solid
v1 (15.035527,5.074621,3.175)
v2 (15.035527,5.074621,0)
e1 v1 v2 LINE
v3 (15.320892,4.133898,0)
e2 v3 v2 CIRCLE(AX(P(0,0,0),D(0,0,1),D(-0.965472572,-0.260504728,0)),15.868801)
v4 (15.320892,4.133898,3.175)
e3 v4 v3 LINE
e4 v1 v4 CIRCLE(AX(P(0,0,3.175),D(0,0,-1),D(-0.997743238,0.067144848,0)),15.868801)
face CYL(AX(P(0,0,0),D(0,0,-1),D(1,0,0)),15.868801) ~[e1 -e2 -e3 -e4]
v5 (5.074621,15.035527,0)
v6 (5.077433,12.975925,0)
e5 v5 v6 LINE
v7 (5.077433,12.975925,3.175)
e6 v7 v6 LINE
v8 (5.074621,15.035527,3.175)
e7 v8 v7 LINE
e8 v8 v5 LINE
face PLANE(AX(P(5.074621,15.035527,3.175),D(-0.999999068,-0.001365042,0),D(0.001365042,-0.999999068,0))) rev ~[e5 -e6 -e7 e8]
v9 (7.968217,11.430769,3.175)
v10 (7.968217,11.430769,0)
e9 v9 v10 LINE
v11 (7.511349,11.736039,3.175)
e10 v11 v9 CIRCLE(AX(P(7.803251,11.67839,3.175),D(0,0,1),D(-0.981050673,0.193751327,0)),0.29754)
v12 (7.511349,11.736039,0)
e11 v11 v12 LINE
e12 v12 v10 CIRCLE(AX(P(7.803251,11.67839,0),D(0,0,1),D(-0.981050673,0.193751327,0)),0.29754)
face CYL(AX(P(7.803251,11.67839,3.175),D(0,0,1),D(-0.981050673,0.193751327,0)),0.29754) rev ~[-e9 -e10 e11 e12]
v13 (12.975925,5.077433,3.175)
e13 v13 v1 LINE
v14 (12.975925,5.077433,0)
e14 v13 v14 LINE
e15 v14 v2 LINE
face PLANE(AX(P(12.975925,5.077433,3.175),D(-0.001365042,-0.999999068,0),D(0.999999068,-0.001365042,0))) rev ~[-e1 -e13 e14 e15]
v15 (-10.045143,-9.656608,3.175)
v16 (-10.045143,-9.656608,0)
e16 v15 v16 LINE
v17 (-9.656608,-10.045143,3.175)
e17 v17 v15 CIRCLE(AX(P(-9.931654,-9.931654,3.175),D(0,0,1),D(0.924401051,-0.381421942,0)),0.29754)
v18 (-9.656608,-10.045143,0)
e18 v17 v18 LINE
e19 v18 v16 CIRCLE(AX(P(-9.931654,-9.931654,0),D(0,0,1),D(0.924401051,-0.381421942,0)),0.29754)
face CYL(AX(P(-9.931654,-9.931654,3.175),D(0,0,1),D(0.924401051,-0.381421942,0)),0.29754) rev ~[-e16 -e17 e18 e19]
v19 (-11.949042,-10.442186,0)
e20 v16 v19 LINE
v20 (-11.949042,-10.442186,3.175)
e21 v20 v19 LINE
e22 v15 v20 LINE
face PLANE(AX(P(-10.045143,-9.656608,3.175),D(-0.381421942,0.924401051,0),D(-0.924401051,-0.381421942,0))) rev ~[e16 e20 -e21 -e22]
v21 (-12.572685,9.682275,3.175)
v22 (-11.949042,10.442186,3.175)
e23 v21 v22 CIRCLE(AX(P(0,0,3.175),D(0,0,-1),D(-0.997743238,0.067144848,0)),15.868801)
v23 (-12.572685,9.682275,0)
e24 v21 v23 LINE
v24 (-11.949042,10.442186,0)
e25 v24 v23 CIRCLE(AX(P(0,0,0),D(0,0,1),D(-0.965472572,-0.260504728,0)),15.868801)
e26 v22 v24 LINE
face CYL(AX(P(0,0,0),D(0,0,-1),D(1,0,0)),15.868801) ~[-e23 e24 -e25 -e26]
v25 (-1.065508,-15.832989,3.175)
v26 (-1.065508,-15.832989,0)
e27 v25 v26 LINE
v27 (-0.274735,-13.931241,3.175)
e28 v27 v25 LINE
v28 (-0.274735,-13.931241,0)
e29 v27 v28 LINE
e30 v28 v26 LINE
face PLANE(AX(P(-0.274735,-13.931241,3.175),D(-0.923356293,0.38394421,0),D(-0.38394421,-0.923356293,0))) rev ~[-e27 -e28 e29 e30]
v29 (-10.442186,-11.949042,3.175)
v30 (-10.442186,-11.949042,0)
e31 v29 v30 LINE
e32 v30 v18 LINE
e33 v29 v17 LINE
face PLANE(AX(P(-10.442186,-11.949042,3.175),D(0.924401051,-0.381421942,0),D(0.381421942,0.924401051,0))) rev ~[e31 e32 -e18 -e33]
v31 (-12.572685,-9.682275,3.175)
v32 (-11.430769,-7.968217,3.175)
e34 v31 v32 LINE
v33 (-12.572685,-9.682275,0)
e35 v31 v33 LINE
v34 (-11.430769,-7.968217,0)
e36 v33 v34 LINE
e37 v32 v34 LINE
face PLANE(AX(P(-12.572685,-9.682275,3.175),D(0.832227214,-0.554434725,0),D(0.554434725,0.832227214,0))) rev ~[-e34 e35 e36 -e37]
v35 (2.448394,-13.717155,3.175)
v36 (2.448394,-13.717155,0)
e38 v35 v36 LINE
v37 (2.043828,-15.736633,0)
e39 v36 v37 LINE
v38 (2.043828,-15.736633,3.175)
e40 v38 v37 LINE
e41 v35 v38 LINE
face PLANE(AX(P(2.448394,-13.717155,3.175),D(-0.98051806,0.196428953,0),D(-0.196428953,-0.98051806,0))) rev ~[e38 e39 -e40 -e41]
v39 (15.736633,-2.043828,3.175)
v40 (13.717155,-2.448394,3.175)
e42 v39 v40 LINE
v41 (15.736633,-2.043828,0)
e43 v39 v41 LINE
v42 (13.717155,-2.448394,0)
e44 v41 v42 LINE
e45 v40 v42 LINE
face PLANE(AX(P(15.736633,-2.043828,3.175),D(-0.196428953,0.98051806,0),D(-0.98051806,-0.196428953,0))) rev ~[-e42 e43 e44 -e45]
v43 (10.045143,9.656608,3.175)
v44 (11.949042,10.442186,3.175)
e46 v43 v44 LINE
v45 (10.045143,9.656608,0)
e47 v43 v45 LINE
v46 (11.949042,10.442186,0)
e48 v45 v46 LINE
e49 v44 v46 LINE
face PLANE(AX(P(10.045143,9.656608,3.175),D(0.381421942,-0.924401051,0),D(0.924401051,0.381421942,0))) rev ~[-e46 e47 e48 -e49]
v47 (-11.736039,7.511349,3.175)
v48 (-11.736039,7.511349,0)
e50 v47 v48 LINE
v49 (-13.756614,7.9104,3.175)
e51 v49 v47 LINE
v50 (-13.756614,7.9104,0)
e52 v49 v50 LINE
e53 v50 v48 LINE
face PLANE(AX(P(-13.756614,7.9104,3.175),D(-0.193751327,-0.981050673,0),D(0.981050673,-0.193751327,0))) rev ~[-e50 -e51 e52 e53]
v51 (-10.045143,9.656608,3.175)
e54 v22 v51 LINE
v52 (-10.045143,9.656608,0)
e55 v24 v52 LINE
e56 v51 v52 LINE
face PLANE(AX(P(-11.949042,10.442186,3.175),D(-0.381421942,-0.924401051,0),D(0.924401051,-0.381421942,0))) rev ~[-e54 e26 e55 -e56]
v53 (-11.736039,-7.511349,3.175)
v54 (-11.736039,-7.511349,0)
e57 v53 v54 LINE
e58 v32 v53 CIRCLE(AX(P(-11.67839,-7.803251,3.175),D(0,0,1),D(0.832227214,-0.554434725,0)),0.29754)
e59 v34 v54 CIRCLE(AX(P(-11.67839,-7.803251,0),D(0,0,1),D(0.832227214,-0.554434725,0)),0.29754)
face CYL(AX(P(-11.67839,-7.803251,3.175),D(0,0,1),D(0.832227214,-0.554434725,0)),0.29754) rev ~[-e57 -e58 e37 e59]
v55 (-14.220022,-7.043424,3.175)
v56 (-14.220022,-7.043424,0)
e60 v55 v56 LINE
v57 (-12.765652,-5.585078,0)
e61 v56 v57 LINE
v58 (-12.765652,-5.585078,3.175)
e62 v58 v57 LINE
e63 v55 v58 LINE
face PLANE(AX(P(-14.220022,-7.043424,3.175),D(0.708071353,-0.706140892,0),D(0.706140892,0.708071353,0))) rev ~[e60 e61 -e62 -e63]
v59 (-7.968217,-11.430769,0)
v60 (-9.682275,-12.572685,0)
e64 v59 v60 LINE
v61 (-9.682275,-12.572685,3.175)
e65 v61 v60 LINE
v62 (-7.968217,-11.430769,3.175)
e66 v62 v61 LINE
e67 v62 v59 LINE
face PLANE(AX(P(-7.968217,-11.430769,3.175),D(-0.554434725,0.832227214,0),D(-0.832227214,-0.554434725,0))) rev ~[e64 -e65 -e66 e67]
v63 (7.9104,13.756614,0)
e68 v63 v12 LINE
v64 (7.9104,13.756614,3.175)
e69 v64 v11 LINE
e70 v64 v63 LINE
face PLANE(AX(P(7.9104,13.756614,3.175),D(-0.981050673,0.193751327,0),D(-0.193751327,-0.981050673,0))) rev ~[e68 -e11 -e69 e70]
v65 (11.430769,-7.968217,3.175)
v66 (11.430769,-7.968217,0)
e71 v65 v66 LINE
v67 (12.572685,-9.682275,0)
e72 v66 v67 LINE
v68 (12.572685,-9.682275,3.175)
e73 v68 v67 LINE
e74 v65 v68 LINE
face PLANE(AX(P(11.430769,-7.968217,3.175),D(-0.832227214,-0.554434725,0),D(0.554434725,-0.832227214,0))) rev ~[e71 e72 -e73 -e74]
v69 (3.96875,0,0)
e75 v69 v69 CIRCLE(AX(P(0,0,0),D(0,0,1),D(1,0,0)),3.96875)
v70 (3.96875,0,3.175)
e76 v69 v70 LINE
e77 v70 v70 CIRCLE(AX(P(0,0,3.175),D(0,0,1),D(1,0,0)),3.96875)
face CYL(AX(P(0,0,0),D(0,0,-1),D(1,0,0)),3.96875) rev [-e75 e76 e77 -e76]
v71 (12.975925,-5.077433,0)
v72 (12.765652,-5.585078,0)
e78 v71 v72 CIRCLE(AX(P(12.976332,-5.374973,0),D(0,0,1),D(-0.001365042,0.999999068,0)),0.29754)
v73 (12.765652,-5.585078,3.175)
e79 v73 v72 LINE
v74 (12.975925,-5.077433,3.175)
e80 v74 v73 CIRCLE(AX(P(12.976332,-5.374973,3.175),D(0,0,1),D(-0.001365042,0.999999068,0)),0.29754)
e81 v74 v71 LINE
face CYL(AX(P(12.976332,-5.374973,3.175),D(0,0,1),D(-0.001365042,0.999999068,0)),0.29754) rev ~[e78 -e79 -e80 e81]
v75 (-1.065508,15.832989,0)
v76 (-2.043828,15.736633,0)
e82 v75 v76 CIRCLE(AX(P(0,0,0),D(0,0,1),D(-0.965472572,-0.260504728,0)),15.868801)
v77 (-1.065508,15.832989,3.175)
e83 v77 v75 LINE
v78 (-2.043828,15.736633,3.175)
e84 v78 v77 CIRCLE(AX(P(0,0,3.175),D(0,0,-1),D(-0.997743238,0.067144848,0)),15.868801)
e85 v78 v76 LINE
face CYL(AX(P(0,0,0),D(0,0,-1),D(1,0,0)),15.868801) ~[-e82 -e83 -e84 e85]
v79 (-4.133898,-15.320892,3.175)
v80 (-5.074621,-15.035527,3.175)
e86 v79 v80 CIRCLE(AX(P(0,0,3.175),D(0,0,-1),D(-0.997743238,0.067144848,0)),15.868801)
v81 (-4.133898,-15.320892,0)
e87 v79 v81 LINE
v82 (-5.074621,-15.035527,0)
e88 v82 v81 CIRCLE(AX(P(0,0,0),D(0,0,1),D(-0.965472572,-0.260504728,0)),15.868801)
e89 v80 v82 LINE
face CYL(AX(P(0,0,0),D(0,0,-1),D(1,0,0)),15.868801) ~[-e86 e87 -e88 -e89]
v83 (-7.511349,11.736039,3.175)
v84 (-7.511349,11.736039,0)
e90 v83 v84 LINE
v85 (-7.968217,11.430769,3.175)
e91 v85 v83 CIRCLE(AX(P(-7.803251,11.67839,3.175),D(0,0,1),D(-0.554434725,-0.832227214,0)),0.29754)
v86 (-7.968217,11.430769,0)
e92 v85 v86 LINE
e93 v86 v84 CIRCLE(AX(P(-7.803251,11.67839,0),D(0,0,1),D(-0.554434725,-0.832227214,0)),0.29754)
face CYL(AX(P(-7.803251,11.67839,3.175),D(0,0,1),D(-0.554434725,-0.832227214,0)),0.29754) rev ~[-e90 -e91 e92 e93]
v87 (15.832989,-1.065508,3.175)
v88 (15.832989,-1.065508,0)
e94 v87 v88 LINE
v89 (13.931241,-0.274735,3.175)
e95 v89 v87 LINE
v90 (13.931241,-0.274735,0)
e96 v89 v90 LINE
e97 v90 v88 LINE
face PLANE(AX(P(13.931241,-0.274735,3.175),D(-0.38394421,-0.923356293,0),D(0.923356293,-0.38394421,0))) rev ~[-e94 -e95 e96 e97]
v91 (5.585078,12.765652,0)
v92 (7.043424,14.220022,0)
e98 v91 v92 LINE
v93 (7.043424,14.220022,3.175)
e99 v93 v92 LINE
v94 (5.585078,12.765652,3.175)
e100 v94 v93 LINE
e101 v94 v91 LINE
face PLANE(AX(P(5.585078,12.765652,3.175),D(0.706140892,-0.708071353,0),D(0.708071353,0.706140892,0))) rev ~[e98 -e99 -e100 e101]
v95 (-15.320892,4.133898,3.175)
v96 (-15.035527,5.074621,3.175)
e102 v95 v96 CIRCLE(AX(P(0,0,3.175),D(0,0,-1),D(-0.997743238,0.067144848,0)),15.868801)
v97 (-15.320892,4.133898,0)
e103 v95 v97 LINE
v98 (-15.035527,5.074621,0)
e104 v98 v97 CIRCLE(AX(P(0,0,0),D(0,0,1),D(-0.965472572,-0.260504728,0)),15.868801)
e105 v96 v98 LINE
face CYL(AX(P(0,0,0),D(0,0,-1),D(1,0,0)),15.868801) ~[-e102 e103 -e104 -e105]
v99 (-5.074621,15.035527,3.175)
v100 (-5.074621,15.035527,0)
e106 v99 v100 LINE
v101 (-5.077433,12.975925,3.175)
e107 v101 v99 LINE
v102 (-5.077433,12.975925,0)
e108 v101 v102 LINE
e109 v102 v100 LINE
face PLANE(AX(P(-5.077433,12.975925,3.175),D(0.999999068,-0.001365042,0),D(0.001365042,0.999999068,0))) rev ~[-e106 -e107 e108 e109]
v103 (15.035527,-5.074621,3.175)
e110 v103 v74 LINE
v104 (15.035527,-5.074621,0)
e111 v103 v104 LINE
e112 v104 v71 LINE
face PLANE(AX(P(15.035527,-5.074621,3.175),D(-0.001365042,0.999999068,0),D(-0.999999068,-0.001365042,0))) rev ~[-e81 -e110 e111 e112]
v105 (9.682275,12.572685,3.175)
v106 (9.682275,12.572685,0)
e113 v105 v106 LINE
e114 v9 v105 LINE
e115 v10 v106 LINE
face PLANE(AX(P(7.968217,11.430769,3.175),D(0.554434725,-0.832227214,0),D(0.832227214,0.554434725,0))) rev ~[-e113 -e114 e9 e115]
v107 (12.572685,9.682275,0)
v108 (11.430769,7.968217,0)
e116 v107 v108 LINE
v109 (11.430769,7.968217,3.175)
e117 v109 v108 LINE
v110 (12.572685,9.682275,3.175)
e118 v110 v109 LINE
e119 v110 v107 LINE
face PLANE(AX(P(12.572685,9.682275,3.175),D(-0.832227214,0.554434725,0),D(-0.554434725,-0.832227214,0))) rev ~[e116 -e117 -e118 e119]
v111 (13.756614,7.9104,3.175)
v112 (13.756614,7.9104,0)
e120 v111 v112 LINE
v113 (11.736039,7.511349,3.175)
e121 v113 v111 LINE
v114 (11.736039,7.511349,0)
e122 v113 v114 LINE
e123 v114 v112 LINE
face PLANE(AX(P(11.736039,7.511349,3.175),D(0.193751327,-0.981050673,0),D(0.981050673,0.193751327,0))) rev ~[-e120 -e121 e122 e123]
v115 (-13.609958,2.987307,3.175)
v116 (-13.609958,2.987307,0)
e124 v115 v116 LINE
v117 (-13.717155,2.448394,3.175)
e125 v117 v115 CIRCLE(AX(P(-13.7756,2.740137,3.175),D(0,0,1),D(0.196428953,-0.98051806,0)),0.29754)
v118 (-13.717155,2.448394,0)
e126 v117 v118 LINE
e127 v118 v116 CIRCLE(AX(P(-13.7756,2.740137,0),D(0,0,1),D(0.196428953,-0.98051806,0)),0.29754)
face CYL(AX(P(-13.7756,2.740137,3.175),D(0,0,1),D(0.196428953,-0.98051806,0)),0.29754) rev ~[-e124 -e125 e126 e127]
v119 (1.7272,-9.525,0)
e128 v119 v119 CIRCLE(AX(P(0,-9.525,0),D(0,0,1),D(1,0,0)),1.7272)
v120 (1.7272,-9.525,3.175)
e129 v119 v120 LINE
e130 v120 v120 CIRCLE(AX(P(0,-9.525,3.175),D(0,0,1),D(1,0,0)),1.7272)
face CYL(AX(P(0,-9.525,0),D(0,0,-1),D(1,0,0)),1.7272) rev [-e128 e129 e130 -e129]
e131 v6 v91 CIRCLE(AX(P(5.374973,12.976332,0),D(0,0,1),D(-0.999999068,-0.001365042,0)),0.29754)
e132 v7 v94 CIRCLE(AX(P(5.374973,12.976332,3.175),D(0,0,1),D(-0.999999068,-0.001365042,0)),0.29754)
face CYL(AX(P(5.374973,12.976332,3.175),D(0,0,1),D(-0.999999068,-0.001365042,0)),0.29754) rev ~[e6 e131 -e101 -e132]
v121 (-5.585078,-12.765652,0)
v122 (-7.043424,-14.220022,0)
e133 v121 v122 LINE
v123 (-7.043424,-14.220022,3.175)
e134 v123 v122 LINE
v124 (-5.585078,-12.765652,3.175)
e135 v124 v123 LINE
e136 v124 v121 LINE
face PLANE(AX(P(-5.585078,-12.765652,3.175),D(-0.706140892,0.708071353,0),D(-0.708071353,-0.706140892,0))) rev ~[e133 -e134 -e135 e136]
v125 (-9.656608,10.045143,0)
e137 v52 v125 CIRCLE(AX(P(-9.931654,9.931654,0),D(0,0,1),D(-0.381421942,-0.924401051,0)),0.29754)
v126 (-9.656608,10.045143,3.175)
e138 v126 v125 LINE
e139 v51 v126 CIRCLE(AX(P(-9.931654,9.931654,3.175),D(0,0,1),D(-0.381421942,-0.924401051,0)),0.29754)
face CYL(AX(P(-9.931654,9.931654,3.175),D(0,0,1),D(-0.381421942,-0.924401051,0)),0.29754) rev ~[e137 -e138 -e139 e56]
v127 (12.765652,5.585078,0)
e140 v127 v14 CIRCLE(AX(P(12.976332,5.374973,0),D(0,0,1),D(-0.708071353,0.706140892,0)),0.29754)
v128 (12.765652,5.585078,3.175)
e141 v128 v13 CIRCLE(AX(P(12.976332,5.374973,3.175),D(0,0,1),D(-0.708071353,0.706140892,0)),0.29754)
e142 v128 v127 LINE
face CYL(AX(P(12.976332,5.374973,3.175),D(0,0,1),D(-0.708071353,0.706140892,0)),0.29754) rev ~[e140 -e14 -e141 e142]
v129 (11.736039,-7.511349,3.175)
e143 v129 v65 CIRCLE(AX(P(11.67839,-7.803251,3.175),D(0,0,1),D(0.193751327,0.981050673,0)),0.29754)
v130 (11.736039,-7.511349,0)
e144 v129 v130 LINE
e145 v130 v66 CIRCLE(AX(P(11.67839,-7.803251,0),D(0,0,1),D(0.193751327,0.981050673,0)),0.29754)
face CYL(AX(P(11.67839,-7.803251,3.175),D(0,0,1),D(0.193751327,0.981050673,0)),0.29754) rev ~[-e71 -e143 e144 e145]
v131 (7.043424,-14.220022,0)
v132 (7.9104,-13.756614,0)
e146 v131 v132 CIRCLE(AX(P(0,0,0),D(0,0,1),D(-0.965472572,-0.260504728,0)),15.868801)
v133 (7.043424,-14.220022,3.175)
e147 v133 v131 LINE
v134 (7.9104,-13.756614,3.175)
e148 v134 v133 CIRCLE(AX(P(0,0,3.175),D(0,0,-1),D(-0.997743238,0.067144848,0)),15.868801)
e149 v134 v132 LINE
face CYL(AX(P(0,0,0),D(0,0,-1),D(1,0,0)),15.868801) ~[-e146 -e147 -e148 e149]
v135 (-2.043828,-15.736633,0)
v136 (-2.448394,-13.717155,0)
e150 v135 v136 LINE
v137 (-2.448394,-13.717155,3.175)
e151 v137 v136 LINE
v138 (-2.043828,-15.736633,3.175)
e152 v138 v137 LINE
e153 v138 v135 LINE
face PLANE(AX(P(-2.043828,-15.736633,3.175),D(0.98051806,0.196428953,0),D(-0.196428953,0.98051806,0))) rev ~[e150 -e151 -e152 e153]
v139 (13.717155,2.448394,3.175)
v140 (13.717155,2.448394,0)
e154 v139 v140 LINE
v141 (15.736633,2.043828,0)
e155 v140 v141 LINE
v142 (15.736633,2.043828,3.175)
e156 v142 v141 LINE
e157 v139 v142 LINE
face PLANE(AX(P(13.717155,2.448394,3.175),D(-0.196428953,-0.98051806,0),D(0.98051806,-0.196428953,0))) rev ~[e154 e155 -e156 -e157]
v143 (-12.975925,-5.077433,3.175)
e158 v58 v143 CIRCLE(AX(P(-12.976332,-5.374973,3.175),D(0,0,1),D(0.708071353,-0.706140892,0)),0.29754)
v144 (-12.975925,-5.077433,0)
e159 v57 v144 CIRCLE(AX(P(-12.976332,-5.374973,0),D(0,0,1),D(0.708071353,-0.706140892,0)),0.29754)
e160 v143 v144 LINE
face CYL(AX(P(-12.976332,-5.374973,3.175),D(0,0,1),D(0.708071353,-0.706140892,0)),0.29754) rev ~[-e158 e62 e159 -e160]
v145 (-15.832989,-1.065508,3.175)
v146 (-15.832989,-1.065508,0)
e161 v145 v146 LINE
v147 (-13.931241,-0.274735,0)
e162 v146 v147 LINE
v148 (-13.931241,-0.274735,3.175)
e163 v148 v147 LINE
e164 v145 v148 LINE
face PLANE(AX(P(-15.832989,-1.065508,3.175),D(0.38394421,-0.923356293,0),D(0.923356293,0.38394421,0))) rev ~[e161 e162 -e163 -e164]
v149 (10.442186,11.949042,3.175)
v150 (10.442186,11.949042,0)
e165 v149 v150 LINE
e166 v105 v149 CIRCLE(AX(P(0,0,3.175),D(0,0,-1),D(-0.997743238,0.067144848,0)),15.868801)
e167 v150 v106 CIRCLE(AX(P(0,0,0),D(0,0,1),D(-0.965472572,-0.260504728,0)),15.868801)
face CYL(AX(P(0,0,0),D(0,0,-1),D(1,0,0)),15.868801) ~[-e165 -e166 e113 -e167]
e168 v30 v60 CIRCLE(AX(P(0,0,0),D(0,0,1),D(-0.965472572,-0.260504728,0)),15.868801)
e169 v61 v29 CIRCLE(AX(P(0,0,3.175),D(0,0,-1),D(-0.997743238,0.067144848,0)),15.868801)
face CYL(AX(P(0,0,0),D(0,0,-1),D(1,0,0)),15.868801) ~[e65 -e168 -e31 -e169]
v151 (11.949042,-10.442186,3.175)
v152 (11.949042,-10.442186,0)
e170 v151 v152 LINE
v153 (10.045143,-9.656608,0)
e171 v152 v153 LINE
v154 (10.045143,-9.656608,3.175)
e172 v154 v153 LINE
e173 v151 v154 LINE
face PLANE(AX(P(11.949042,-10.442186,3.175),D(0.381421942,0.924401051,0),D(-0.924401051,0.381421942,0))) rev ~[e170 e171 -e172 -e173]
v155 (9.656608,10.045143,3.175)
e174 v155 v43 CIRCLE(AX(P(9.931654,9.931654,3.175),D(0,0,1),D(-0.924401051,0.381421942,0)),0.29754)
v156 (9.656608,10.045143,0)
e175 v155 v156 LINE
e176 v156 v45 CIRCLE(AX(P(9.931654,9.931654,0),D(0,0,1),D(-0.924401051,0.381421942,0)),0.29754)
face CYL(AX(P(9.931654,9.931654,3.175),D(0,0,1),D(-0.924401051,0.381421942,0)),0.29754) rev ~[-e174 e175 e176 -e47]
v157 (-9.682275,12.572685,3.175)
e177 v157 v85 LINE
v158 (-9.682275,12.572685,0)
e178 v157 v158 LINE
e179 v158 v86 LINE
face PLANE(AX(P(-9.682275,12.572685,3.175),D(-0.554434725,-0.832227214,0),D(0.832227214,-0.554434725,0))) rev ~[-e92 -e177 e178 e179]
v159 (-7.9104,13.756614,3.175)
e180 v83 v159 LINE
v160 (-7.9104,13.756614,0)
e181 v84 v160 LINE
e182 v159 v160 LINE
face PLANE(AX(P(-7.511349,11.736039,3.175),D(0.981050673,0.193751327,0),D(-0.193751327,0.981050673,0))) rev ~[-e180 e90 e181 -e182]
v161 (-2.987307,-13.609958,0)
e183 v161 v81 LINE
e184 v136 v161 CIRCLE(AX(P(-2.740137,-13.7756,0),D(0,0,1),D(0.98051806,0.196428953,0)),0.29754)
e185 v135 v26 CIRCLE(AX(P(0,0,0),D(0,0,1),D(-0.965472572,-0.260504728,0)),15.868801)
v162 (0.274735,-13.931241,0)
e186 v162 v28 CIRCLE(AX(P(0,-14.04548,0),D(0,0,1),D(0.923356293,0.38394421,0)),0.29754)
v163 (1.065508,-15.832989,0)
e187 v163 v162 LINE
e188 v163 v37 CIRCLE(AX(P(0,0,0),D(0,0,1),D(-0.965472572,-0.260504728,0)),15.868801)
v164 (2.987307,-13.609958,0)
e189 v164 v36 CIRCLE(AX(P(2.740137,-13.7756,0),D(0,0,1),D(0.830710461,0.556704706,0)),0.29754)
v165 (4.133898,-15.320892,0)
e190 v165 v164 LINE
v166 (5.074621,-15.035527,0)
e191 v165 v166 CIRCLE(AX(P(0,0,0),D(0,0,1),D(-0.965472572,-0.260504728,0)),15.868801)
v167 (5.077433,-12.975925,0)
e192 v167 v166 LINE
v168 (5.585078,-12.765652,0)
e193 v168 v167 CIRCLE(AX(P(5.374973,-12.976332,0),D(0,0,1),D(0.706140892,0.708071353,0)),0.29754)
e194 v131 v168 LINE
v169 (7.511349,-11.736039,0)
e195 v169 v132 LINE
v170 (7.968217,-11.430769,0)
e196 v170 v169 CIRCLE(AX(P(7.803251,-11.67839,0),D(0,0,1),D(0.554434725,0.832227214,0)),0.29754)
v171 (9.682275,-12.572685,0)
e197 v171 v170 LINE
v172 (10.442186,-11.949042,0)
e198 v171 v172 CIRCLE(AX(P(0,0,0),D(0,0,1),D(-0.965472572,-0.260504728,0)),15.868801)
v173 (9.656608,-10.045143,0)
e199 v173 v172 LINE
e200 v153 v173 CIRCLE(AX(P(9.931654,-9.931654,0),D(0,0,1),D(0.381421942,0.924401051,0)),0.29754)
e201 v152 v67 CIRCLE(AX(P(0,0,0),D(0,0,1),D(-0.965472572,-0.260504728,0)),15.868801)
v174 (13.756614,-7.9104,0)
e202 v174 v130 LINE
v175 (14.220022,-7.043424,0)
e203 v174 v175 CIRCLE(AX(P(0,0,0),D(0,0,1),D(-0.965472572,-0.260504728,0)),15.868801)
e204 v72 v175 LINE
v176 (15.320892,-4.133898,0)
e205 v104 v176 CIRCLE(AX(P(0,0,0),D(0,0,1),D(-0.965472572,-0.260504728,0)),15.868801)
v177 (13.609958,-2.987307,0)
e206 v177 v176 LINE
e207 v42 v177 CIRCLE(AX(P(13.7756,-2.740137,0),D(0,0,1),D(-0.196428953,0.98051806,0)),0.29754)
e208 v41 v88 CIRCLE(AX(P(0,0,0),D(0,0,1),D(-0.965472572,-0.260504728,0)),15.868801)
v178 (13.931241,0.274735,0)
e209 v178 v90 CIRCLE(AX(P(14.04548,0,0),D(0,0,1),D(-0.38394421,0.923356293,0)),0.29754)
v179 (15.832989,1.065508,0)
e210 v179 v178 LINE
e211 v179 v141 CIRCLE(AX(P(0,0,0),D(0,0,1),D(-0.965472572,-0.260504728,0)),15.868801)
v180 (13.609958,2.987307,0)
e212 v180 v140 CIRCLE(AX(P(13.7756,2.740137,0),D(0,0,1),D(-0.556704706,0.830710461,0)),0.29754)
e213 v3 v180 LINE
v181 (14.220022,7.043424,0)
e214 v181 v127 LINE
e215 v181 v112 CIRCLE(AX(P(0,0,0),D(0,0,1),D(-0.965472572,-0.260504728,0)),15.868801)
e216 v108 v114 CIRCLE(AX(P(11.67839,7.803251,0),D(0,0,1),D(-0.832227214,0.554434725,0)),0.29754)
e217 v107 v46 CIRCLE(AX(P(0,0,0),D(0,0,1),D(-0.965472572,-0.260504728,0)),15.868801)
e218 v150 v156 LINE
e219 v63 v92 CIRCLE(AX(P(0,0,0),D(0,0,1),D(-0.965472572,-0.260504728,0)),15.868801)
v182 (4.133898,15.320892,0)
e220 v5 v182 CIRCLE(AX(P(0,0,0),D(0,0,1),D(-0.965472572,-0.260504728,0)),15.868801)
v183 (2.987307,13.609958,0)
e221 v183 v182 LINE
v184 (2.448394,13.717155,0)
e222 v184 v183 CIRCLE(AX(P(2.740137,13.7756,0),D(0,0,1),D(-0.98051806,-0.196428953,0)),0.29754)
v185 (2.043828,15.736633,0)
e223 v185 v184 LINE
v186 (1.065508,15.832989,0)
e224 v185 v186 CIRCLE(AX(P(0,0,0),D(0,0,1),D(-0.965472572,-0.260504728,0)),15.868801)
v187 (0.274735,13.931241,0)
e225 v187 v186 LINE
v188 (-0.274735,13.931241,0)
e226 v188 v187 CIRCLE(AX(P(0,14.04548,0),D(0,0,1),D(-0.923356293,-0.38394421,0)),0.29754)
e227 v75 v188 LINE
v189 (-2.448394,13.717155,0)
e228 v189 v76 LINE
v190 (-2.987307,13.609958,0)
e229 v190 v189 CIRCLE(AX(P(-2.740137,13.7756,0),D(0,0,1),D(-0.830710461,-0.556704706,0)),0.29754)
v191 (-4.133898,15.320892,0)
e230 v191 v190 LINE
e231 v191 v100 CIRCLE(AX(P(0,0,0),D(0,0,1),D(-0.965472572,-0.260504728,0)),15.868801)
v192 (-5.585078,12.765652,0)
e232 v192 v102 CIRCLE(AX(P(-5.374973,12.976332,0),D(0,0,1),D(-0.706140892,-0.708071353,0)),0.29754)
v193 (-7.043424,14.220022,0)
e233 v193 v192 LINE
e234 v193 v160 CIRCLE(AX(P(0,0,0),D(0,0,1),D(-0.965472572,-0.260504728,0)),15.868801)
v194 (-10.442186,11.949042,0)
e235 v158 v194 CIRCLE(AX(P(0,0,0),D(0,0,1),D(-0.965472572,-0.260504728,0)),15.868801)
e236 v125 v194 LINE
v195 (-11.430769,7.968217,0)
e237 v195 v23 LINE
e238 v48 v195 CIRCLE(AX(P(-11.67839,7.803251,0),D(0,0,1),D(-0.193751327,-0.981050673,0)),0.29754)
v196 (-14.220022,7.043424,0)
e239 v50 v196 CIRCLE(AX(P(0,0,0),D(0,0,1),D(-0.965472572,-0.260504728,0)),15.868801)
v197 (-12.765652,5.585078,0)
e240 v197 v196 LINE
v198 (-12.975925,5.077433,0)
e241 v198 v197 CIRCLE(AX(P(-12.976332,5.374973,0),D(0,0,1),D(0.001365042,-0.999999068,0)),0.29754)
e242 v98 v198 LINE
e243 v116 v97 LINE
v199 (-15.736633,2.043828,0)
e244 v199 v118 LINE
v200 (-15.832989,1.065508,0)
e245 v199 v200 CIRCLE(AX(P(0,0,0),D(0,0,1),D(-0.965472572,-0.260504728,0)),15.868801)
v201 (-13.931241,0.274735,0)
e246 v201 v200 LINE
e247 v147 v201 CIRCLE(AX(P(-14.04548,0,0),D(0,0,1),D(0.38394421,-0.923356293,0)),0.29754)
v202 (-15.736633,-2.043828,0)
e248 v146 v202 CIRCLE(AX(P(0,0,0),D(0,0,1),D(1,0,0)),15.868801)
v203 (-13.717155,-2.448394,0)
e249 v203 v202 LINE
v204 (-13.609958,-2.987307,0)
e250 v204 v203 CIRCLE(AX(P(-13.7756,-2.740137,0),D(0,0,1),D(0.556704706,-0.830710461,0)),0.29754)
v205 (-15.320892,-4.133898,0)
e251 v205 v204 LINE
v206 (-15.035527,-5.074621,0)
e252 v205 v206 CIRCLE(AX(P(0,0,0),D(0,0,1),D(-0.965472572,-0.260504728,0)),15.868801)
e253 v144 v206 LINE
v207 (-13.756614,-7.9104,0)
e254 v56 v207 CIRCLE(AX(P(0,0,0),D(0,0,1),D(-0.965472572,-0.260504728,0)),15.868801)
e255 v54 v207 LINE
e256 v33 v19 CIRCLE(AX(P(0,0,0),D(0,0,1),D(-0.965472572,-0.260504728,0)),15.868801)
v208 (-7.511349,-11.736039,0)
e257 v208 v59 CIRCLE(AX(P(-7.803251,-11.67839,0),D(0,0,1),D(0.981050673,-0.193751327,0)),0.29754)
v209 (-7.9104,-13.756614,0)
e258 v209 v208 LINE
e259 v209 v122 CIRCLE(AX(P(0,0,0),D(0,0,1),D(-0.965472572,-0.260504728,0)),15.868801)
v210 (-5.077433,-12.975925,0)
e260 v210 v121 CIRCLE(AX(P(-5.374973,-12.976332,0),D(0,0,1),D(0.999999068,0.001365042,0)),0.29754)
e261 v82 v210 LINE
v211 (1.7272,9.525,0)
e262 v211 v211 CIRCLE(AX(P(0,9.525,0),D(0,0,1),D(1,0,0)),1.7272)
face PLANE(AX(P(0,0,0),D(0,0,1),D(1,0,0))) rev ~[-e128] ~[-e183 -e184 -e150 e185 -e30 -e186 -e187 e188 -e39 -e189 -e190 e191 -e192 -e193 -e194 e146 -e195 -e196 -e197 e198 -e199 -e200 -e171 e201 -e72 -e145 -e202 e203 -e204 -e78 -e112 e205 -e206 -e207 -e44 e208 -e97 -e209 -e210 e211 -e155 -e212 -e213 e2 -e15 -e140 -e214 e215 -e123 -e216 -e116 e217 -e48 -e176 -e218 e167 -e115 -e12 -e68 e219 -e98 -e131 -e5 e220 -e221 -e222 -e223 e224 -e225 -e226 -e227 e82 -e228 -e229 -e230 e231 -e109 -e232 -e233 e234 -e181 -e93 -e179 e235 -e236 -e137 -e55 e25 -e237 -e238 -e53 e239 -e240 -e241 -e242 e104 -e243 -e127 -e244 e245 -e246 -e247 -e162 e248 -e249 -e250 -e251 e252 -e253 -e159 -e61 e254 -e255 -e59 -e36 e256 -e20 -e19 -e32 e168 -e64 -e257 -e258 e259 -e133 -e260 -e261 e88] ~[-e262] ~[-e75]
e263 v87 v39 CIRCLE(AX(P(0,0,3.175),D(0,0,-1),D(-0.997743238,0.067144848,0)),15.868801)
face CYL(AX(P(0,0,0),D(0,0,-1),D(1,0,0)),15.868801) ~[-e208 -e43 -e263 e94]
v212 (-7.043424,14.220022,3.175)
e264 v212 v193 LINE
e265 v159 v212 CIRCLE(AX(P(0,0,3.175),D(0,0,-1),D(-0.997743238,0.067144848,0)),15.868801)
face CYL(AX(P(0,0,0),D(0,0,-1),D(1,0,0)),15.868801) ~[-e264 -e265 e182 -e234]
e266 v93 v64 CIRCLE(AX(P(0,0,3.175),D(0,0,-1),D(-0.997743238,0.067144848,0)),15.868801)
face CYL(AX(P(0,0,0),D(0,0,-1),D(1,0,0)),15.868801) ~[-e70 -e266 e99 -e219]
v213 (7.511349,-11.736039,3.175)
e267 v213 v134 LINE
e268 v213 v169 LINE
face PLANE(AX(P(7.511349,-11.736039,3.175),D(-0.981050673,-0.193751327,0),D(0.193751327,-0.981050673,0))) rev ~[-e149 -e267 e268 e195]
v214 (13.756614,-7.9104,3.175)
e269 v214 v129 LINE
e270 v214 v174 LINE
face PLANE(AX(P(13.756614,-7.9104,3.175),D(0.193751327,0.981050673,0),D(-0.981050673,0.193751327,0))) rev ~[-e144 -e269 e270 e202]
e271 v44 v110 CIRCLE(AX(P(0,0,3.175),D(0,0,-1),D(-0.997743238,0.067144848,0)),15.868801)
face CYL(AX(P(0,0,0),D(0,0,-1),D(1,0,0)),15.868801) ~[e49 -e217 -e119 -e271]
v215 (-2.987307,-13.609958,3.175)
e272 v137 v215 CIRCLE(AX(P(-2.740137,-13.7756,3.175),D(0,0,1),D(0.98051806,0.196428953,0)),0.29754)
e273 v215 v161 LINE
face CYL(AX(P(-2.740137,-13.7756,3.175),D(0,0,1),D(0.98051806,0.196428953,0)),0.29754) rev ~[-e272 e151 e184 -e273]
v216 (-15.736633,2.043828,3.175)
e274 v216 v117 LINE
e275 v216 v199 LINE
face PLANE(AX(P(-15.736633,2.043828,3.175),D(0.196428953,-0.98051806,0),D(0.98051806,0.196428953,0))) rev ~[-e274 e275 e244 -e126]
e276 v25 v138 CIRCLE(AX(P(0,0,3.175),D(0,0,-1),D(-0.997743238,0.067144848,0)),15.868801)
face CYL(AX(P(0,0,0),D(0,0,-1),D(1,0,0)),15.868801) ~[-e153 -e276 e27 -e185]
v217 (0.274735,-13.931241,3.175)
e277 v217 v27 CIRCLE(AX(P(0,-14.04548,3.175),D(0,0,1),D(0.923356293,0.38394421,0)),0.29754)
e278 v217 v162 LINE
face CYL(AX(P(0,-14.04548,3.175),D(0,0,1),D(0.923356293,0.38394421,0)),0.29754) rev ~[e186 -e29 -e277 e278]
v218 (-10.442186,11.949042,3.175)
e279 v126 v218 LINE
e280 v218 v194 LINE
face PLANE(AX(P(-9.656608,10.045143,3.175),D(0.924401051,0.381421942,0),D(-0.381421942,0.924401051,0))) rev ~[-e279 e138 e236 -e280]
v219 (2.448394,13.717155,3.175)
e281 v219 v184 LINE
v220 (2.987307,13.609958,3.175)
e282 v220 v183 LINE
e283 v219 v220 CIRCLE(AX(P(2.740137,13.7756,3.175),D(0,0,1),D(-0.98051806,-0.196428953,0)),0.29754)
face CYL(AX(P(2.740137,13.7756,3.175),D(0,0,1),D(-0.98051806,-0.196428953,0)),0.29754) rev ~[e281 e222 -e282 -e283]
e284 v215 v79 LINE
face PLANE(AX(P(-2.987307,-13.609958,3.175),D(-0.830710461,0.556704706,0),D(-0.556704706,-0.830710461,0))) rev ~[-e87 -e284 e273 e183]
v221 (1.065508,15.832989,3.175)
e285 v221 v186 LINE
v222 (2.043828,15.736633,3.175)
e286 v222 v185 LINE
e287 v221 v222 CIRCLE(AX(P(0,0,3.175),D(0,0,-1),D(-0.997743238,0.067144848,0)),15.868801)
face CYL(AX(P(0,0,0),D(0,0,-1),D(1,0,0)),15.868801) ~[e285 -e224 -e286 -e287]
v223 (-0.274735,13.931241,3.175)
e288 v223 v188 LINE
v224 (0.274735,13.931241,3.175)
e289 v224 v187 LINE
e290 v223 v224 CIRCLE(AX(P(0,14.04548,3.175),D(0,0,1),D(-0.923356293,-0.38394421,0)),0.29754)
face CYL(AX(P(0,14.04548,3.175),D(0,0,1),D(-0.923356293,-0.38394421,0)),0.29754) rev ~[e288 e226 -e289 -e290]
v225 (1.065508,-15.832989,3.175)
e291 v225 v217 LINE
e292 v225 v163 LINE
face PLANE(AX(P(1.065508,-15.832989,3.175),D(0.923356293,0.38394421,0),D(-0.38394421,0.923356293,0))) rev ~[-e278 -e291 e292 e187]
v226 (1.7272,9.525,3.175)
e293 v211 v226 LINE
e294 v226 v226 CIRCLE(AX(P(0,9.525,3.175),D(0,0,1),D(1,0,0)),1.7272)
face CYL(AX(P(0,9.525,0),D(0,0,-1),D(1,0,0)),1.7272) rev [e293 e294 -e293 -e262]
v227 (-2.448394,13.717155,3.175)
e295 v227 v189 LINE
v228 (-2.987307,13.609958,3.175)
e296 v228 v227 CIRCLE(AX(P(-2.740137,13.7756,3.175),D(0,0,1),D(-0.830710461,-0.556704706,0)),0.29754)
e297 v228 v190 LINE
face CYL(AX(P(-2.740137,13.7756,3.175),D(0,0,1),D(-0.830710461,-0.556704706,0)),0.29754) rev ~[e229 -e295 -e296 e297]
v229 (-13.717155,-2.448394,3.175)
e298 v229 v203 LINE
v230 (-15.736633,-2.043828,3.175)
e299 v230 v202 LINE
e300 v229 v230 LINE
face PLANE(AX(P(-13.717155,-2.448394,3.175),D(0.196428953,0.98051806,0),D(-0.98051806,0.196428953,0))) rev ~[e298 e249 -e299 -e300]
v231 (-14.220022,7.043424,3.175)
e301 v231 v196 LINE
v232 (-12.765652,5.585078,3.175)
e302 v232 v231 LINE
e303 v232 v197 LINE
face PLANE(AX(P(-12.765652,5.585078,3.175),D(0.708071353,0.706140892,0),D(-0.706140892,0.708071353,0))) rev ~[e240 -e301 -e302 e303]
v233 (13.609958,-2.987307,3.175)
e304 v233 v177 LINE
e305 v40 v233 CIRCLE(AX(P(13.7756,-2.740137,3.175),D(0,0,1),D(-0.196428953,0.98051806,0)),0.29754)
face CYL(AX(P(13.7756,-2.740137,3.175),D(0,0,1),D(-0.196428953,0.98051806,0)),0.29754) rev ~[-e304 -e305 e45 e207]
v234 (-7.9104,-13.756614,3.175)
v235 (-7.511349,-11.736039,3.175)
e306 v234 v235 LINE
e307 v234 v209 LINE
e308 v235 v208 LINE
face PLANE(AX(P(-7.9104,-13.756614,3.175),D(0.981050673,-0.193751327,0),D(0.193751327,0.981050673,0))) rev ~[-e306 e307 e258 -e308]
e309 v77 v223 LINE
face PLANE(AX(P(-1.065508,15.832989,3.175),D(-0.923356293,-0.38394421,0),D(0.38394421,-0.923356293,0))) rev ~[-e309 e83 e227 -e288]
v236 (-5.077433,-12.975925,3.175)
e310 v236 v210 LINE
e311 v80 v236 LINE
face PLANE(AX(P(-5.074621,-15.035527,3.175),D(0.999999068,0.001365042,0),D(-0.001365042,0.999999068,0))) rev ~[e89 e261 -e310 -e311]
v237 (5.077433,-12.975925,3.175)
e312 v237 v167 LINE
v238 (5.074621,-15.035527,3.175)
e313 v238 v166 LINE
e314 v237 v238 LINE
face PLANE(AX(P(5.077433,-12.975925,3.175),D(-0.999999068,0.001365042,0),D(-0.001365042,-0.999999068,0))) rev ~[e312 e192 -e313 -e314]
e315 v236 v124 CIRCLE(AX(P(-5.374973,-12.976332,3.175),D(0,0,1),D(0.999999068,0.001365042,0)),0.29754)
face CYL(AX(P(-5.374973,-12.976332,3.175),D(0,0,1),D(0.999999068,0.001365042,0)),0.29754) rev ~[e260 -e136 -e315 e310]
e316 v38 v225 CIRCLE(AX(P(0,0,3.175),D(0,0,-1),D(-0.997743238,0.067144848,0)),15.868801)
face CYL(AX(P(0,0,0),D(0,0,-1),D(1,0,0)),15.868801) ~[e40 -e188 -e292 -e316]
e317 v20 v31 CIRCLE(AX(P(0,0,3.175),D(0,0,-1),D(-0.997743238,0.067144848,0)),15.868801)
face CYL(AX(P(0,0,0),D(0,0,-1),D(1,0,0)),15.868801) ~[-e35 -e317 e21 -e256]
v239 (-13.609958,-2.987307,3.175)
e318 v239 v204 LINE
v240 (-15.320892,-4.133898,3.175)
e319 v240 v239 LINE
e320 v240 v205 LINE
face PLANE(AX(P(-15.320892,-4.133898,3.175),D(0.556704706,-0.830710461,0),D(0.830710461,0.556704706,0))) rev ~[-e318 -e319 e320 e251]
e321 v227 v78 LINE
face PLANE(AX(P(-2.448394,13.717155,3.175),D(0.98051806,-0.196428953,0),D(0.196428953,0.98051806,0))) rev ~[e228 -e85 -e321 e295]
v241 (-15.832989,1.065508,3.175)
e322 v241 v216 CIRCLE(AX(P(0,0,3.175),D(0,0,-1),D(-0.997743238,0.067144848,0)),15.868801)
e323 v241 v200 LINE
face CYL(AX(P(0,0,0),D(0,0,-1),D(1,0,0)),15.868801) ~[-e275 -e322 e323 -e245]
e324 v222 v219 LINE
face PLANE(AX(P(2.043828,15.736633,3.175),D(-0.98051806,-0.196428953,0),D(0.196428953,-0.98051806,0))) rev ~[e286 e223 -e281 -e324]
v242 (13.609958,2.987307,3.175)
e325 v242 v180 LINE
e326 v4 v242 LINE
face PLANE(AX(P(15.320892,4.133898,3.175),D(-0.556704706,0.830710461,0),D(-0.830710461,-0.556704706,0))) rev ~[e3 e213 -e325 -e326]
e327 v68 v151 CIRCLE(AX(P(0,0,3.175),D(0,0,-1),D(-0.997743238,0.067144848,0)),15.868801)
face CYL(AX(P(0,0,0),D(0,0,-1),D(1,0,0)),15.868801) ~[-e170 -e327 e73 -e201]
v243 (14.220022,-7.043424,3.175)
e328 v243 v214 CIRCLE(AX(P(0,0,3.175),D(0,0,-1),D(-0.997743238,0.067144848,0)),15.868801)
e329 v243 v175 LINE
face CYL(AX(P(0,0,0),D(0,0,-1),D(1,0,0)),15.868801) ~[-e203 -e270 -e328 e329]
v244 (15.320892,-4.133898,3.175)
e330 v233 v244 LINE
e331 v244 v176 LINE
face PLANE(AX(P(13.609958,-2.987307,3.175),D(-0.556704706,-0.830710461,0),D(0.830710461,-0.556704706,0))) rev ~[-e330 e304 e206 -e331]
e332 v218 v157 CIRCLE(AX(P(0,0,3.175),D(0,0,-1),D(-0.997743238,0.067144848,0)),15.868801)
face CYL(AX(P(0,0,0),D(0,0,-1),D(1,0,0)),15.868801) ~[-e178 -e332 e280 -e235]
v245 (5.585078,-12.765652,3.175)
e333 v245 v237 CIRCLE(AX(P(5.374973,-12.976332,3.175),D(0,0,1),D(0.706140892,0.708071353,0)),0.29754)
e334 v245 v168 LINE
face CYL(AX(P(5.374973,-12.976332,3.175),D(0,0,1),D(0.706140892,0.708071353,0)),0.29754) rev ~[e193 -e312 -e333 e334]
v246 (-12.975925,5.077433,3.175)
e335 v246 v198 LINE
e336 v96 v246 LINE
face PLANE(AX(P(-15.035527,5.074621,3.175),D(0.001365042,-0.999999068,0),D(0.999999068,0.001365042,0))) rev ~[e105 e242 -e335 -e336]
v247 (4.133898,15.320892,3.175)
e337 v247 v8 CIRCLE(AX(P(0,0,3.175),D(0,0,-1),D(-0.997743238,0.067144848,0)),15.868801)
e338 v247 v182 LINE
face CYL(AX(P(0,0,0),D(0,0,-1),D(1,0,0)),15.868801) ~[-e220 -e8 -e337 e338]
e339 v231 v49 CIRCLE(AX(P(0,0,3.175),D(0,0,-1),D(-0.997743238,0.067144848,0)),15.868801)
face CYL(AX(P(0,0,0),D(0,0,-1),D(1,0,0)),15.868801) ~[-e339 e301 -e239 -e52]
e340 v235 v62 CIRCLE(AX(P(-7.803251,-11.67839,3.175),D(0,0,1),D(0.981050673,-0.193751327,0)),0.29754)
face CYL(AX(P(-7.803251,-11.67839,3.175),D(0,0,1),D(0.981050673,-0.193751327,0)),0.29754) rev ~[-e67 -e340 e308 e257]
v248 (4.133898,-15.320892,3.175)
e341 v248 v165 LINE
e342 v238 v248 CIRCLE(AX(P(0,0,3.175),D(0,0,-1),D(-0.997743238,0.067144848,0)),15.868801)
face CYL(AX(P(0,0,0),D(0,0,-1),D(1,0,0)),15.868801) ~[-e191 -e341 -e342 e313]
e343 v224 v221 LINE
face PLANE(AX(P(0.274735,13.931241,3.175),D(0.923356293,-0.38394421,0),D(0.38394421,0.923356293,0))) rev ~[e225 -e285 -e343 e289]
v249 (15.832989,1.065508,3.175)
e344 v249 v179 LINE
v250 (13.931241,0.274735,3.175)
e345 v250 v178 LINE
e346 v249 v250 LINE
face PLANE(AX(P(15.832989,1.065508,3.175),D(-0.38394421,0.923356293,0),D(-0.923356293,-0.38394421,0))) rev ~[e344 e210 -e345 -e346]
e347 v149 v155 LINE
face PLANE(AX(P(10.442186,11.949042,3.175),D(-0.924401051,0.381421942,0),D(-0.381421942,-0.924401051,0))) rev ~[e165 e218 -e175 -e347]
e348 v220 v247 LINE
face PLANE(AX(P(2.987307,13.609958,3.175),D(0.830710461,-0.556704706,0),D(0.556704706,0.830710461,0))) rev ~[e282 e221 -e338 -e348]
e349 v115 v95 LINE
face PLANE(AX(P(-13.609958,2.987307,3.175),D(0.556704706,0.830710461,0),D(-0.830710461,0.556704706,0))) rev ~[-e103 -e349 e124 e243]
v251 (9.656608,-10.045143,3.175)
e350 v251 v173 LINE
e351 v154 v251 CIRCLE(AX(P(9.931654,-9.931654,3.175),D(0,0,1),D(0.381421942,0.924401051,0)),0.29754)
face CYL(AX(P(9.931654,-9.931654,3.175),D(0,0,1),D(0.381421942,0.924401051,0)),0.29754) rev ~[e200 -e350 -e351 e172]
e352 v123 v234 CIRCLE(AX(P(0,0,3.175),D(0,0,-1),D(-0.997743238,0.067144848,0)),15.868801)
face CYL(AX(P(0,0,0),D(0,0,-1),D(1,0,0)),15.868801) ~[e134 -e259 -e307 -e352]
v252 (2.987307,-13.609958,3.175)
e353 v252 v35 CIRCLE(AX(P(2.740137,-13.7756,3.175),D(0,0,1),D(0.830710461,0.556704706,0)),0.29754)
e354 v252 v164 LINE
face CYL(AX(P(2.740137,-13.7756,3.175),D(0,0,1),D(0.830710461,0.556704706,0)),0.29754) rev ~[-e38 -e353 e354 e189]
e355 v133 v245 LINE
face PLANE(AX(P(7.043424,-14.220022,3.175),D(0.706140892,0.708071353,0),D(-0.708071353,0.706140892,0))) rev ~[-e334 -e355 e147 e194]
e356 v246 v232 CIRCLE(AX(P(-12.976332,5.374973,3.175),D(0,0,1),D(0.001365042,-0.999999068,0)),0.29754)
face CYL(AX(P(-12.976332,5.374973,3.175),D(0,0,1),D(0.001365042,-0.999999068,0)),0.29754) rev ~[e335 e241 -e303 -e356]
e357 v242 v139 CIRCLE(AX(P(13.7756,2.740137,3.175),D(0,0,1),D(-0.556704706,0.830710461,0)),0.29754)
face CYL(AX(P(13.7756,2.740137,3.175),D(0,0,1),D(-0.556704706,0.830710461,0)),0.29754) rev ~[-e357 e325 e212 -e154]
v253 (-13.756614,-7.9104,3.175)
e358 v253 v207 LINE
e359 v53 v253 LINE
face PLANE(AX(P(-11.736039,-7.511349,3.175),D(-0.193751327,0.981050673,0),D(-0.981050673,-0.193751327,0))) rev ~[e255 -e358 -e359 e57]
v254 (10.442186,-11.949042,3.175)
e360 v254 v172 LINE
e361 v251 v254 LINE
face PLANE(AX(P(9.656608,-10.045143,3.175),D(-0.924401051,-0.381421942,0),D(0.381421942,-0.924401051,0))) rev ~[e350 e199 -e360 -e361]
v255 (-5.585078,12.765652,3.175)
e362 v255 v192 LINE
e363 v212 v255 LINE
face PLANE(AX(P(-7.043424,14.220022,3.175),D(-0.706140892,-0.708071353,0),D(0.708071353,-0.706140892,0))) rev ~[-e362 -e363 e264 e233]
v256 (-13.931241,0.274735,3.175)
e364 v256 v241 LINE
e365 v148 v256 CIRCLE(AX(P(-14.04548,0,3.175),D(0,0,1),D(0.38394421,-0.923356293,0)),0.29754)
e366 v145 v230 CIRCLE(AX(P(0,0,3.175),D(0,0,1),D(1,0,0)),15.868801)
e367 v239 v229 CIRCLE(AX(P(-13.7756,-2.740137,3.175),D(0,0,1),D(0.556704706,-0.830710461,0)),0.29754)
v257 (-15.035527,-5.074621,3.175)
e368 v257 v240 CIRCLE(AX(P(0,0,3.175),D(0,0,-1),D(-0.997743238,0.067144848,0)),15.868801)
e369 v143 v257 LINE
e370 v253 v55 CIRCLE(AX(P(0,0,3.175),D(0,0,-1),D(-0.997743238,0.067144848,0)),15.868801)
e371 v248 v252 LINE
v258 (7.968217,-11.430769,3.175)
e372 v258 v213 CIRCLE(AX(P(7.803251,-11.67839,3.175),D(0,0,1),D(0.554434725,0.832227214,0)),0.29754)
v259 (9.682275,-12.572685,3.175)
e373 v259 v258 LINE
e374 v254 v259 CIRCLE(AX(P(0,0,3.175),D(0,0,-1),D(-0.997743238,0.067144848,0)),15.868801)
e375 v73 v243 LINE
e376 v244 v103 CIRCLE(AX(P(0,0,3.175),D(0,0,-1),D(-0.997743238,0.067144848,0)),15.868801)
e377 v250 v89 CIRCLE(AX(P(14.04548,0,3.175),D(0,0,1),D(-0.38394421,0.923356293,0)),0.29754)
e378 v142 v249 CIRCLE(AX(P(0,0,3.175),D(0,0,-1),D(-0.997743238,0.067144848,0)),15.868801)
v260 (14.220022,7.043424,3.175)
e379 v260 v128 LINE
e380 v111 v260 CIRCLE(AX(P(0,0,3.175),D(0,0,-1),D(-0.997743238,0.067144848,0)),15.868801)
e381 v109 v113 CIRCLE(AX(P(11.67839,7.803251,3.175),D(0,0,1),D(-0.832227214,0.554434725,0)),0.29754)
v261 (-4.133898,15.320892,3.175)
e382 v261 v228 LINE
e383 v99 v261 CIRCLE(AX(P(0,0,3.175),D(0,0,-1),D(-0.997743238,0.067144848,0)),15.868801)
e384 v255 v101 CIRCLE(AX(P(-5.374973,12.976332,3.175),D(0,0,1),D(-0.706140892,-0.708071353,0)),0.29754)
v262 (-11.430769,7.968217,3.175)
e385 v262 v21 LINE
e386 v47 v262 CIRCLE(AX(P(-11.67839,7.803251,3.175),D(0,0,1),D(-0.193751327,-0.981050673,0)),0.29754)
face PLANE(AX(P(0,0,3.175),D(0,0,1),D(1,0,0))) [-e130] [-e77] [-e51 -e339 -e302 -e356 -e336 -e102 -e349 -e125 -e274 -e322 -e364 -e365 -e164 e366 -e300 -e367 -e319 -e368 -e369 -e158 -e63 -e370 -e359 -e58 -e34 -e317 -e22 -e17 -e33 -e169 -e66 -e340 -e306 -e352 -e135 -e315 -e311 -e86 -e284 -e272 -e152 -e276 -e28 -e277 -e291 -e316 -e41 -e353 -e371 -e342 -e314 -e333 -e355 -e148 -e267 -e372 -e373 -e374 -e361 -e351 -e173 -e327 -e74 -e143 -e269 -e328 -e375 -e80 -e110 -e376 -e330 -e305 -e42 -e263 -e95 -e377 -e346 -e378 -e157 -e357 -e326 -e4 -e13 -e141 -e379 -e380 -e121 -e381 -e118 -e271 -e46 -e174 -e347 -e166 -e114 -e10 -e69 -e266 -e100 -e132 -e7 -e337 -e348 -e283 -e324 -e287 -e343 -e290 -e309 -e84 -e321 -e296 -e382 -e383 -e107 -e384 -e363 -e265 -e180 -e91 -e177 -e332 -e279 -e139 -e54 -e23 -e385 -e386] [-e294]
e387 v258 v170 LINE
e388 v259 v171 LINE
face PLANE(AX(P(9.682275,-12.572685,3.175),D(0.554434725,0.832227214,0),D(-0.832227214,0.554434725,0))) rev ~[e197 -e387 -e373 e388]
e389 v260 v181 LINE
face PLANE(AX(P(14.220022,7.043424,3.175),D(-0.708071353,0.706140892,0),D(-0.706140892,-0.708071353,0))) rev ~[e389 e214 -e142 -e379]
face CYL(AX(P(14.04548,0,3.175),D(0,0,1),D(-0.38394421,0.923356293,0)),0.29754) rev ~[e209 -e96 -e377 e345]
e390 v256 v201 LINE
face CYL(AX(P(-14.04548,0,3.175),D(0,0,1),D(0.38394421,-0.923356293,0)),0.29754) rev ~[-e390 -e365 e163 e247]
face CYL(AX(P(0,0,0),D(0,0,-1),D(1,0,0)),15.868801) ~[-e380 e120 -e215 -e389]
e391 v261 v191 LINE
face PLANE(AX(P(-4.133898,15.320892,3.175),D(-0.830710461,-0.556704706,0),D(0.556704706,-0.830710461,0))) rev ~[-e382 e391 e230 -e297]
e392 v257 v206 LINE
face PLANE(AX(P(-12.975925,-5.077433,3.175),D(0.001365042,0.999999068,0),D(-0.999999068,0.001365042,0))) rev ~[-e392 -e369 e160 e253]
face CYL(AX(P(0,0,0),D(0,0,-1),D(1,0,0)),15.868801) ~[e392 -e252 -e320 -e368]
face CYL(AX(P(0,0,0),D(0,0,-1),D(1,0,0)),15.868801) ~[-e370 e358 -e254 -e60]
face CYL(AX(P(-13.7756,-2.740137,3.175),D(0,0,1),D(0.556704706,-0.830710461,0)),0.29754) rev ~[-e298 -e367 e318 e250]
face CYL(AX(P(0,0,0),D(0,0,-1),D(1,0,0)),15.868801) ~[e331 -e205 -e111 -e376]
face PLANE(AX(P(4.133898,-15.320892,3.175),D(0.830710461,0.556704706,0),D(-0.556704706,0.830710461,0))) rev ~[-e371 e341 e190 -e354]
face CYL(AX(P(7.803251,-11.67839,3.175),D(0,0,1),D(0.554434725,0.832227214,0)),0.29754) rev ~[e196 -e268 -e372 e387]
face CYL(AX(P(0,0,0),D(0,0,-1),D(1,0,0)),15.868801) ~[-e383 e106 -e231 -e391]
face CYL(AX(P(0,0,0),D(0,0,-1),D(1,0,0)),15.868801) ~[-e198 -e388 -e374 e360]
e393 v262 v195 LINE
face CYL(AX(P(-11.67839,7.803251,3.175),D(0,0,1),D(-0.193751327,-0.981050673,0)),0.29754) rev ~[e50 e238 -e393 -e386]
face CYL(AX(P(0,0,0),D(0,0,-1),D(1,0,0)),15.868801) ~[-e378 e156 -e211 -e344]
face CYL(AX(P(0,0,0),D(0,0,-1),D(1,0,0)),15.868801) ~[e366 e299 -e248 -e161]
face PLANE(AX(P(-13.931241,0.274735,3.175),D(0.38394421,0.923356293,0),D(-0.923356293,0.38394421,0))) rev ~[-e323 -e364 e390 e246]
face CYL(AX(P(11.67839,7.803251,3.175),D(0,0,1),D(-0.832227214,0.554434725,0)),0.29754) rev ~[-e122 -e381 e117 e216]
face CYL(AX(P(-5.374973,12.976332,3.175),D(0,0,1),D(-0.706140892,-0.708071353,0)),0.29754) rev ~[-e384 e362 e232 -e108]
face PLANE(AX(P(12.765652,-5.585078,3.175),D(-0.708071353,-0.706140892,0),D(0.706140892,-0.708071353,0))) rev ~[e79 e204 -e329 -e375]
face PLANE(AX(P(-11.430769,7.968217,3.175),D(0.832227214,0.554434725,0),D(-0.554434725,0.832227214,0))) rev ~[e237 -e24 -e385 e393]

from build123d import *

# Parameters (mm, degrees)
F0_R            = 15.8688012495
F0_R_2          = 1.7272
F0_R_3          = 3.96875
F1_DEPTH        = 3.175
F3_DEPTH        = 3.175
F3_COPIES_COUNT = 32


# Not quite as in the source:
# - a pattern or mirror of a feature is missing from the dataset's text; its kind, count and spacing are read off the source's solid


with BuildPart() as f1:
    # F0 (on Top) → F1 (new body)
    with BuildSketch(Plane.XY):
        Circle(F0_R)
        with Locations((0, -9.525)):
            Circle(F0_R_2, mode=Mode.SUBTRACT)
        Circle(F0_R_3, mode=Mode.SUBTRACT)
        with Locations((0, 9.525)):
            Circle(F0_R_2, mode=Mode.SUBTRACT)
    extrude(amount=F1_DEPTH)

    # F2 (on face) → F3 (cut, through all)
    with BuildSketch(Plane.XY.offset(3.175)):
        with BuildLine():
            Line((-13.9312413972, 0.274735453), (-15.8329891451, 1.065508248))
            ThreePointArc((-15.8329891451, 1.065508248), (-15.8688012495, 0), (-15.8329891451, -1.065508248))
            Line((-15.8329891451, -1.065508248), (-13.9312413972, -0.274735453))
            ThreePointArc((-13.9312413972, -0.274735453), (-13.747940143, 0), (-13.9312413972, 0.274735453))
        make_face()
    f3 = extrude(amount=-F3_DEPTH, mode=Mode.SUBTRACT)

    # F3_copies: F3 ×32 about axis
    f3_copies_axis = Axis((0, 0, 0), (0, 0, 1))
    for i in range(1, F3_COPIES_COUNT):
        add(f3.rotate(f3_copies_axis, i * 360 / F3_COPIES_COUNT), mode=Mode.SUBTRACT)


solid = f1.part
